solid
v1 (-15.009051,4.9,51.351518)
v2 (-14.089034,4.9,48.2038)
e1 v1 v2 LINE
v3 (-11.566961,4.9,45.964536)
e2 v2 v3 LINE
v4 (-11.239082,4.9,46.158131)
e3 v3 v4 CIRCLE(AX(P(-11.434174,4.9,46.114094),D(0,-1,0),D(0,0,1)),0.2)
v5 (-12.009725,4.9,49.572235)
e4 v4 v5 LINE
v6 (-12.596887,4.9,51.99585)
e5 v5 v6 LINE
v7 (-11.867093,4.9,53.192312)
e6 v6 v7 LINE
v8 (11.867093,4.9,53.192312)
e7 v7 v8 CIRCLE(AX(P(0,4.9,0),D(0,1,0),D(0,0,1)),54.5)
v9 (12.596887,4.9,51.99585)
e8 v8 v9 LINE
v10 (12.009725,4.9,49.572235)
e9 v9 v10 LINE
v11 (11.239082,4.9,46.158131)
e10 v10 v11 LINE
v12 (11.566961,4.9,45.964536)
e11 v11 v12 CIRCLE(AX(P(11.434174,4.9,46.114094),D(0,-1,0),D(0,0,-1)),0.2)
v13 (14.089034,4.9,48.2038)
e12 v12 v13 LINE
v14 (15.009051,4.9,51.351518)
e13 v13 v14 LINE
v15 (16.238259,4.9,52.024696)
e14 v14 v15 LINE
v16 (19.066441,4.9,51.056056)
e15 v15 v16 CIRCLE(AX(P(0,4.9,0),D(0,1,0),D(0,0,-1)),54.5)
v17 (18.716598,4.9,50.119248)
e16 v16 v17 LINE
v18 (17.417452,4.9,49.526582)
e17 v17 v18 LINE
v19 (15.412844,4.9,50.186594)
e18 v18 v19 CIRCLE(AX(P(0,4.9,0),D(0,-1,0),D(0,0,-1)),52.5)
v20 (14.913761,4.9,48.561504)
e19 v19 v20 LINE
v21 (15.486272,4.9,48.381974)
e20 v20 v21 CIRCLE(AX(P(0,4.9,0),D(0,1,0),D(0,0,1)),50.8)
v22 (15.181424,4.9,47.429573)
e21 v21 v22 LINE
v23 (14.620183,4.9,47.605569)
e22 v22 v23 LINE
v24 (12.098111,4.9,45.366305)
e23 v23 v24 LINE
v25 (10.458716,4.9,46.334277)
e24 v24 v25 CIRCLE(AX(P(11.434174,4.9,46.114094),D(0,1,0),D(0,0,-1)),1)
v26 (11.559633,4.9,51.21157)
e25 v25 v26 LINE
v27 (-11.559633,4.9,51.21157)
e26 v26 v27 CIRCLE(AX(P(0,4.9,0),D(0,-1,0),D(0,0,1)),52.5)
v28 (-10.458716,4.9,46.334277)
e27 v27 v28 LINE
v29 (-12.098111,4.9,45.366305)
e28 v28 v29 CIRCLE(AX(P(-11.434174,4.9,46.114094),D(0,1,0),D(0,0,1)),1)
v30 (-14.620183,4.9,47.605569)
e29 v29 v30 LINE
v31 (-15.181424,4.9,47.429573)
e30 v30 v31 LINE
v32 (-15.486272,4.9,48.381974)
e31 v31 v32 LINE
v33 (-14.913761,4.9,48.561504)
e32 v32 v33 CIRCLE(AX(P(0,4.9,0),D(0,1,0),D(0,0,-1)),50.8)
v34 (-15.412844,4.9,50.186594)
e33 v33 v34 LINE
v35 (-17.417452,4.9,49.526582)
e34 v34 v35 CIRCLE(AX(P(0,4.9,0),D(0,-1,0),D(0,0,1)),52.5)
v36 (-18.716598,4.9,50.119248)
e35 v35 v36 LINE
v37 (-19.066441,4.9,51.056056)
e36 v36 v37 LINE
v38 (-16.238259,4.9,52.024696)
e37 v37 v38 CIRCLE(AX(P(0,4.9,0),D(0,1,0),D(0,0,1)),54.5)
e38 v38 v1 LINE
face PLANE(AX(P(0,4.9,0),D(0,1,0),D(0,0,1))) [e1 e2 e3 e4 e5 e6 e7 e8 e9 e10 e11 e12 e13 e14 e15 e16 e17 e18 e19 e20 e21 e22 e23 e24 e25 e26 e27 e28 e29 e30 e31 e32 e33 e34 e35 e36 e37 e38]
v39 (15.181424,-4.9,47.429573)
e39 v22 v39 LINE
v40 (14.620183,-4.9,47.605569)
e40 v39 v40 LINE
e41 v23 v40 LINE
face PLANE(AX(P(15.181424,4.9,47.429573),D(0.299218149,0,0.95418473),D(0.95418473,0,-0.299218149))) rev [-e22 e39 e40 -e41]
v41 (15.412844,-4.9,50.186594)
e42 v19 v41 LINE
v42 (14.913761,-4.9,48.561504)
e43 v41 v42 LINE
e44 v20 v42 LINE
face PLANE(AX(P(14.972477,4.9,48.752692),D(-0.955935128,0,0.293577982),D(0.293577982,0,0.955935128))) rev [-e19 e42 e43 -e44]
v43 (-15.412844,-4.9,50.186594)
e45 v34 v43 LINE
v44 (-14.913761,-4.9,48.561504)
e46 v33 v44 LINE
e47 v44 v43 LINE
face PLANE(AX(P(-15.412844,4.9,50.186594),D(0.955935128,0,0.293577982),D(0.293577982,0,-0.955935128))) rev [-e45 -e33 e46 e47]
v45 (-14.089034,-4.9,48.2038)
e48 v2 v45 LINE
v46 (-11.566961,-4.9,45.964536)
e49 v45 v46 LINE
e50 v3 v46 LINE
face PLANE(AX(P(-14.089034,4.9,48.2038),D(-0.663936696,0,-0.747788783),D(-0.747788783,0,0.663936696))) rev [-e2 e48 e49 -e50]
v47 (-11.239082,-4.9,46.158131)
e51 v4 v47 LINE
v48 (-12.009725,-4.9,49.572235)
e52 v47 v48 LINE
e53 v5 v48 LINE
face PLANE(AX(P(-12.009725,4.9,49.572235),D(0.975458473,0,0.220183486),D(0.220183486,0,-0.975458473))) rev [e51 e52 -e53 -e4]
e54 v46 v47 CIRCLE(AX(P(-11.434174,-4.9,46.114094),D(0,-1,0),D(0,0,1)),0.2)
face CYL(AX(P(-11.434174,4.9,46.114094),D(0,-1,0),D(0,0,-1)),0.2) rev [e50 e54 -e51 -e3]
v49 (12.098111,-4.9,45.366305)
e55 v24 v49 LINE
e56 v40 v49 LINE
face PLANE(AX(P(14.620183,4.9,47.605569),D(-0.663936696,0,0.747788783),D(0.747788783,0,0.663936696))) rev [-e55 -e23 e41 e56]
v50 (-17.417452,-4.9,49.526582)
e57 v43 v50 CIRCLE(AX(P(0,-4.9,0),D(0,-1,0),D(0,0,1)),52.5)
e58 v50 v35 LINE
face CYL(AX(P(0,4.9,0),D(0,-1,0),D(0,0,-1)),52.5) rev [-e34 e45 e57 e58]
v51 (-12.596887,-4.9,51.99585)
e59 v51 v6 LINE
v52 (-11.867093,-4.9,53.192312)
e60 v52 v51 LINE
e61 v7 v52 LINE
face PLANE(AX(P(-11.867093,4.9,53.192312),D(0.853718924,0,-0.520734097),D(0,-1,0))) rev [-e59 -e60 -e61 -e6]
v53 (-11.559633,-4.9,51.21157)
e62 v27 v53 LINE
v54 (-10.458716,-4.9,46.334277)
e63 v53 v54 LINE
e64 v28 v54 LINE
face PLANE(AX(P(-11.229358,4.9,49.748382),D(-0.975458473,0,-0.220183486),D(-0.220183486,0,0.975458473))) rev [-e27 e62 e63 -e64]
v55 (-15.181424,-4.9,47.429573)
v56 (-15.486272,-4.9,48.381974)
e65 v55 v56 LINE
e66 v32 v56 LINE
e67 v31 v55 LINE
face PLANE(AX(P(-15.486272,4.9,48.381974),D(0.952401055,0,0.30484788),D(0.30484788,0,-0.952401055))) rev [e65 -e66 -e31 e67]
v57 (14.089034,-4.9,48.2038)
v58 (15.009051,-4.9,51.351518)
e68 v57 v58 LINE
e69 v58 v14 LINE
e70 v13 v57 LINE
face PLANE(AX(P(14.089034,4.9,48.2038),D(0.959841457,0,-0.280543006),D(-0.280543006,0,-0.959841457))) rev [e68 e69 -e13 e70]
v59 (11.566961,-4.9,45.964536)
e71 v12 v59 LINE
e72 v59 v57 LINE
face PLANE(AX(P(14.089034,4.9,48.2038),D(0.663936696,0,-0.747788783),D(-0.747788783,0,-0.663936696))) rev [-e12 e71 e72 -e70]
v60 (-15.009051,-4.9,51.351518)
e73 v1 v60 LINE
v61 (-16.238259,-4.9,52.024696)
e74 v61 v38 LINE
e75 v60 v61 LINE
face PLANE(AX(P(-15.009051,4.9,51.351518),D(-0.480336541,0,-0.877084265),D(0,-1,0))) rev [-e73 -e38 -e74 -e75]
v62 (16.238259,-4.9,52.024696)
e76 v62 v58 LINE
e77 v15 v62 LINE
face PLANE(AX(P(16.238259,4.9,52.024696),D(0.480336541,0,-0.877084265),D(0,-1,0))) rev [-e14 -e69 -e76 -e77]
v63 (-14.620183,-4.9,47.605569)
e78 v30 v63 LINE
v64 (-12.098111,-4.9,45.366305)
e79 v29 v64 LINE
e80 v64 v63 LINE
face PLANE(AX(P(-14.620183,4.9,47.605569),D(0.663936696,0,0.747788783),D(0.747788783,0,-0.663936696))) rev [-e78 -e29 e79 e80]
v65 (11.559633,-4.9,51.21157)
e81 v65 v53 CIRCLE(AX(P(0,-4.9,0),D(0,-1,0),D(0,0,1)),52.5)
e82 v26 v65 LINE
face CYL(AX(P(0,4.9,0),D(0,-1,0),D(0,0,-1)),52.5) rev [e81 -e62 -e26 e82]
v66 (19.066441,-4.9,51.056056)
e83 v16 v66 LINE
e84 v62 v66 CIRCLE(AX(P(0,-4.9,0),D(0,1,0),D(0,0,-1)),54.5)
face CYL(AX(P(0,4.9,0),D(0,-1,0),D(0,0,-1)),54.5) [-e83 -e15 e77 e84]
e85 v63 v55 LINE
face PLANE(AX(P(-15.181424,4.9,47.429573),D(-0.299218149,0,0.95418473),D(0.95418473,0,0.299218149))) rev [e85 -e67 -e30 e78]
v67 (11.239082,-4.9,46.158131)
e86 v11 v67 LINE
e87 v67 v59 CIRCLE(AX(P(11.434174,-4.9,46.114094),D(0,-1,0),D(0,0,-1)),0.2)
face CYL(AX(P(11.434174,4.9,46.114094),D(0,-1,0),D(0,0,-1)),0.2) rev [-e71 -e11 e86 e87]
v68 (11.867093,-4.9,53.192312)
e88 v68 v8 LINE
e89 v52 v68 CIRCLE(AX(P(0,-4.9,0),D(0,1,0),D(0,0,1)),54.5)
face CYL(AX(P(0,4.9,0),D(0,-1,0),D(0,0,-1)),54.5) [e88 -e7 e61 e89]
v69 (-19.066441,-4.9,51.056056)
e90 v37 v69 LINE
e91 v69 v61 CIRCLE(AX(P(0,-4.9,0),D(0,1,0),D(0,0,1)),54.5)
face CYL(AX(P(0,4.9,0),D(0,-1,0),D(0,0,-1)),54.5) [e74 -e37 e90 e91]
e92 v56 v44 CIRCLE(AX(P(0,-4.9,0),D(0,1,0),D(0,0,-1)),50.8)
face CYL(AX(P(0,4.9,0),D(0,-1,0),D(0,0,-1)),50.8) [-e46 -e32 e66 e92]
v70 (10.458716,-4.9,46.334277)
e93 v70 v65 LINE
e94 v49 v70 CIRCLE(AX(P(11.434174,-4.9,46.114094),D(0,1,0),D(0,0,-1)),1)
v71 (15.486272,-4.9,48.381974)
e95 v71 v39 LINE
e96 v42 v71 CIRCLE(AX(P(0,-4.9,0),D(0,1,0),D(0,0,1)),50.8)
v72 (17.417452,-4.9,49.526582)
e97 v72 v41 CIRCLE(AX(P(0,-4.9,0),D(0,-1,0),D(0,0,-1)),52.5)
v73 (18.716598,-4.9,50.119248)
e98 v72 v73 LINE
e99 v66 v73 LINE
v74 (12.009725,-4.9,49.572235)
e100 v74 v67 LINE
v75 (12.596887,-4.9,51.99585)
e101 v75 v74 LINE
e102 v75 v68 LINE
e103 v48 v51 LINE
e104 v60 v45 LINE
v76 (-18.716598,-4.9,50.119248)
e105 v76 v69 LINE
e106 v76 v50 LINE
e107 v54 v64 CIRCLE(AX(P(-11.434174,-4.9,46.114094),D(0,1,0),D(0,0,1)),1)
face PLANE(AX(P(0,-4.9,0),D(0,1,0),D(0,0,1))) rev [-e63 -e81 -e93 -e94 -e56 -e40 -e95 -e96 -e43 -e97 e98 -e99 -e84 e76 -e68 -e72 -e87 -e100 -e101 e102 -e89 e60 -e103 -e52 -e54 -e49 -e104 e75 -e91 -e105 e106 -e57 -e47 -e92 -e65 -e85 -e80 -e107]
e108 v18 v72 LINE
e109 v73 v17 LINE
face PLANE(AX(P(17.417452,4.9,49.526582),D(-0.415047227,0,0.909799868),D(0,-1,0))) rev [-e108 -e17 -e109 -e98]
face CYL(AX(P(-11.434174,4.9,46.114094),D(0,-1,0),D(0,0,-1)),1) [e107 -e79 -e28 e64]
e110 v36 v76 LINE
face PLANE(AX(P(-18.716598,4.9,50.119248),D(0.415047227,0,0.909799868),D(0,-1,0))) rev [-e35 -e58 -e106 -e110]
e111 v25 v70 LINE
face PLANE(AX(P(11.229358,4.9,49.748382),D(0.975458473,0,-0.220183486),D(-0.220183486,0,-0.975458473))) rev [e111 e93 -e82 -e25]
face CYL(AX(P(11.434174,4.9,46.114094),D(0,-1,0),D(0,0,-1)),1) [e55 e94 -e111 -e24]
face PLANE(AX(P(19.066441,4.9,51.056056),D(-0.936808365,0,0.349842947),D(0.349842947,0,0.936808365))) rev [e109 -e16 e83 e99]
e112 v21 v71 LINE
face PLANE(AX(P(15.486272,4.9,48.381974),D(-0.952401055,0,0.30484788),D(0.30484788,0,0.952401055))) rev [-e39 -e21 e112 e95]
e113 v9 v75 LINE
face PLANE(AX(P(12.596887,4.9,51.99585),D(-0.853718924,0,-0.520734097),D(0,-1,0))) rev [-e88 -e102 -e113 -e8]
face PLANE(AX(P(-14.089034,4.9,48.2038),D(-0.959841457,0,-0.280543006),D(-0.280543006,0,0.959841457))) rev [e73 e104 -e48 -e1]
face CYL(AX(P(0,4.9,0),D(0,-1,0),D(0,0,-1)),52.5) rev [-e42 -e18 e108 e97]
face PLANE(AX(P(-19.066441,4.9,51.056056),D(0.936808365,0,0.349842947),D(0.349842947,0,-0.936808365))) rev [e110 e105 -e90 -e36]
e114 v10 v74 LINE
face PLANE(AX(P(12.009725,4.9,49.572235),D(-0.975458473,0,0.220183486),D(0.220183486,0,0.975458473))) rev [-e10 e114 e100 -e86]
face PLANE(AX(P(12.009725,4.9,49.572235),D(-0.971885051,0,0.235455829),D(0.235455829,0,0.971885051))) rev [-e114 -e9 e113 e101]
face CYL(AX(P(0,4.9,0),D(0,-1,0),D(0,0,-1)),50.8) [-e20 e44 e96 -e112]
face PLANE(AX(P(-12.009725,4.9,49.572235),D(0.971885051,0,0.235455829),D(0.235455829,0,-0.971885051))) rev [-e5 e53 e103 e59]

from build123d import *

# Parameters (mm, degrees)
EXTRUDE_1_DEPTH = 4.9
CHAMFER_1_SIZE  = 1


with BuildPart() as part:
    # Эскиз2 → Бобышка-Вытянуть1 (new, symmetric)
    with BuildSketch(Plane(origin=(0, 0, 0), x_dir=(1, 0, 0), z_dir=(0, 1, 0))):
        with BuildLine():
            Line((-19.066440629, -51.056055877), (-18.366754734, -49.182439148))
            ThreePointArc((-18.366754734, -49.182439148), (-16.897260285, -49.706464317), (-15.412844037, -50.186594213))
            Line((-15.412844037, -50.186594213), (-14.972477064, -48.752691521))
            Line((-14.972477064, -48.752691521), (-14.913761468, -48.561504496))
            ThreePointArc((-14.913761468, -48.561504496), (-15.200281945, -48.472584301), (-15.486272306, -48.381973607))
            Line((-15.486272306, -48.381973607), (-15.181424426, -47.429572551))
            Line((-15.181424426, -47.429572551), (-14.620183486, -47.605569368))
            Line((-14.620183486, -47.605569368), (-12.098110765, -45.366305195))
            ThreePointArc((-12.098110765, -45.366305195), (-10.925741151, -45.252992376), (-10.458715596, -46.334277464))
            Line((-10.458715596, -46.334277464), (-11.229357798, -49.748382119))
            Line((-11.229357798, -49.748382119), (-11.559633028, -51.211569828))
            ThreePointArc((-11.559633028, -51.211569828), (0, -52.5), (11.559633028, -51.211569828))
            Line((11.559633028, -51.211569828), (11.229357798, -49.748382119))
            Line((11.229357798, -49.748382119), (10.458715596, -46.334277464))
            ThreePointArc((10.458715596, -46.334277464), (10.925741151, -45.252992376), (12.098110765, -45.366305195))
            Line((12.098110765, -45.366305195), (14.620183486, -47.605569368))
            Line((14.620183486, -47.605569368), (15.181424426, -47.429572551))
            Line((15.181424426, -47.429572551), (15.486272306, -48.381973607))
            ThreePointArc((15.486272306, -48.381973607), (15.200281945, -48.472584301), (14.913761468, -48.561504496))
            Line((14.913761468, -48.561504496), (14.972477064, -48.752691521))
            Line((14.972477064, -48.752691521), (15.412844037, -50.186594213))
            ThreePointArc((15.412844037, -50.186594213), (16.897260285, -49.706464317), (18.366754734, -49.182439148))
            Line((18.366754734, -49.182439148), (19.066440629, -51.056055877))
            ThreePointArc((19.066440629, -51.056055877), (17.189479987, -51.718195809), (15.289593803, -52.311359391))
            Line((15.289593803, -52.311359391), (14.089034129, -48.203800394))
            Line((14.089034129, -48.203800394), (11.566961408, -45.964536221))
            ThreePointArc((11.566961408, -45.964536221), (11.332487486, -45.941873657), (11.239082375, -46.158130675))
            Line((11.239082375, -46.158130675), (12.009724576, -49.57223533))
            Line((12.009724576, -49.57223533), (12.8323427, -52.967735281))
            ThreePointArc((12.8323427, -52.967735281), (0, -54.5), (-12.8323427, -52.967735281))
            Line((-12.8323427, -52.967735281), (-12.009724576, -49.57223533))
            Line((-12.009724576, -49.57223533), (-11.239082375, -46.158130675))
            ThreePointArc((-11.239082375, -46.158130675), (-11.332487486, -45.941873657), (-11.566961408, -45.964536221))
            Line((-11.566961408, -45.964536221), (-14.089034129, -48.203800394))
            Line((-14.089034129, -48.203800394), (-15.289593803, -52.311359391))
            ThreePointArc((-15.289593803, -52.311359391), (-17.189479987, -51.718195809), (-19.066440629, -51.056055877))
        make_face()
    extrude(amount=EXTRUDE_1_DEPTH, both=True)

    # Фаска1
    # the kernel refuses this chamfer: 1 mm, written as the material it takes off along each edge
    with BuildSketch(Plane(origin=(-18.366754734, 7.496724976, 49.182439148), x_dir=(0.9401293921516592, 0, 0.3408177313646573), z_dir=(0, -1, 0))) as chamfer_1_piece_1:
        with BuildLine():
            Line((1.009757262, 0), (-CHAMFER_1_SIZE * 0.00961673582767, CHAMFER_1_SIZE * 0.999953758127))
            Line((-CHAMFER_1_SIZE * 0.00961673582767, CHAMFER_1_SIZE * 0.999953758127), (0, 0))
            ThreePointArc((0, 0), (0.519160584, 0.002425756), (1.009757262, 0))
        make_face()
    extrude(amount=14.993449951, mode=Mode.SUBTRACT)
    with BuildSketch(Plane(origin=(18.366754734, 7.496724976, 49.182439148), x_dir=(0.34984294732251126, 0, 0.9368083647196467), z_dir=(0, -1, 0))) as chamfer_1_piece_2:
        with BuildLine():
            Line((CHAMFER_1_SIZE, 0), (-0.009710569, 1.009710569))
            ThreePointArc((-0.009710569, 1.009710569), (-0.002566987, 0.519159905), (0, 0))
            Line((0, 0), (CHAMFER_1_SIZE, 0))
        make_face()
    extrude(amount=14.993449951, mode=Mode.SUBTRACT)
    with BuildSketch(Plane(origin=(15.289593803, 7.471682988, 52.311359391), x_dir=(-0.2805430055685125, 0, -0.9598414567138605), z_dir=(0, -1, 0))) as chamfer_1_piece_3:
        with BuildLine():
            Line((CHAMFER_1_SIZE, 0), (0.009010472, 0.990989528))
            ThreePointArc((0.009010472, 0.990989528), (0.002381843, 0.509524531), (0, 0))
            Line((0, 0), (CHAMFER_1_SIZE, 0))
        make_face()
    extrude(amount=14.943365976, mode=Mode.SUBTRACT)
    with BuildSketch(Plane(origin=(12.8323427, 7.471682988, 52.967735281), x_dir=(-0.9739856496022864, 0, 0.22660969610502585), z_dir=(0, -1, 0)), Plane(origin=(-15.289593803, 7.471682988, 52.311359391), x_dir=(-0.9572510798876259, 0, -0.2892583102591421), z_dir=(0, -1, 0))) as chamfer_1_piece_4:
        with BuildLine():
            Line((0.991030491, 0), (CHAMFER_1_SIZE * 0.00909202285035, CHAMFER_1_SIZE * 0.999958666706))
            Line((CHAMFER_1_SIZE * 0.00909202285035, CHAMFER_1_SIZE * 0.999958666706), (0, 0))
            ThreePointArc((0, 0), (0.509525126, -0.002250864), (0.991030491, 0))
        make_face()
    extrude(amount=14.943365976, mode=Mode.SUBTRACT)
    with BuildSketch(Plane(origin=(-12.8323427, -7.471682988, 52.967735281), x_dir=(0.23545582936194254, 0, -0.9718850510320034), z_dir=(0, 1, 0))) as chamfer_1_piece_5:
        with BuildLine():
            Line((CHAMFER_1_SIZE, 0), (0.009010472, -0.990989528))
            ThreePointArc((0.009010472, -0.990989528), (0.002381843, -0.509524531), (0, 0))
            Line((0, 0), (CHAMFER_1_SIZE, 0))
        make_face()
    extrude(amount=14.943365976, mode=Mode.SUBTRACT)


solid = part.part
